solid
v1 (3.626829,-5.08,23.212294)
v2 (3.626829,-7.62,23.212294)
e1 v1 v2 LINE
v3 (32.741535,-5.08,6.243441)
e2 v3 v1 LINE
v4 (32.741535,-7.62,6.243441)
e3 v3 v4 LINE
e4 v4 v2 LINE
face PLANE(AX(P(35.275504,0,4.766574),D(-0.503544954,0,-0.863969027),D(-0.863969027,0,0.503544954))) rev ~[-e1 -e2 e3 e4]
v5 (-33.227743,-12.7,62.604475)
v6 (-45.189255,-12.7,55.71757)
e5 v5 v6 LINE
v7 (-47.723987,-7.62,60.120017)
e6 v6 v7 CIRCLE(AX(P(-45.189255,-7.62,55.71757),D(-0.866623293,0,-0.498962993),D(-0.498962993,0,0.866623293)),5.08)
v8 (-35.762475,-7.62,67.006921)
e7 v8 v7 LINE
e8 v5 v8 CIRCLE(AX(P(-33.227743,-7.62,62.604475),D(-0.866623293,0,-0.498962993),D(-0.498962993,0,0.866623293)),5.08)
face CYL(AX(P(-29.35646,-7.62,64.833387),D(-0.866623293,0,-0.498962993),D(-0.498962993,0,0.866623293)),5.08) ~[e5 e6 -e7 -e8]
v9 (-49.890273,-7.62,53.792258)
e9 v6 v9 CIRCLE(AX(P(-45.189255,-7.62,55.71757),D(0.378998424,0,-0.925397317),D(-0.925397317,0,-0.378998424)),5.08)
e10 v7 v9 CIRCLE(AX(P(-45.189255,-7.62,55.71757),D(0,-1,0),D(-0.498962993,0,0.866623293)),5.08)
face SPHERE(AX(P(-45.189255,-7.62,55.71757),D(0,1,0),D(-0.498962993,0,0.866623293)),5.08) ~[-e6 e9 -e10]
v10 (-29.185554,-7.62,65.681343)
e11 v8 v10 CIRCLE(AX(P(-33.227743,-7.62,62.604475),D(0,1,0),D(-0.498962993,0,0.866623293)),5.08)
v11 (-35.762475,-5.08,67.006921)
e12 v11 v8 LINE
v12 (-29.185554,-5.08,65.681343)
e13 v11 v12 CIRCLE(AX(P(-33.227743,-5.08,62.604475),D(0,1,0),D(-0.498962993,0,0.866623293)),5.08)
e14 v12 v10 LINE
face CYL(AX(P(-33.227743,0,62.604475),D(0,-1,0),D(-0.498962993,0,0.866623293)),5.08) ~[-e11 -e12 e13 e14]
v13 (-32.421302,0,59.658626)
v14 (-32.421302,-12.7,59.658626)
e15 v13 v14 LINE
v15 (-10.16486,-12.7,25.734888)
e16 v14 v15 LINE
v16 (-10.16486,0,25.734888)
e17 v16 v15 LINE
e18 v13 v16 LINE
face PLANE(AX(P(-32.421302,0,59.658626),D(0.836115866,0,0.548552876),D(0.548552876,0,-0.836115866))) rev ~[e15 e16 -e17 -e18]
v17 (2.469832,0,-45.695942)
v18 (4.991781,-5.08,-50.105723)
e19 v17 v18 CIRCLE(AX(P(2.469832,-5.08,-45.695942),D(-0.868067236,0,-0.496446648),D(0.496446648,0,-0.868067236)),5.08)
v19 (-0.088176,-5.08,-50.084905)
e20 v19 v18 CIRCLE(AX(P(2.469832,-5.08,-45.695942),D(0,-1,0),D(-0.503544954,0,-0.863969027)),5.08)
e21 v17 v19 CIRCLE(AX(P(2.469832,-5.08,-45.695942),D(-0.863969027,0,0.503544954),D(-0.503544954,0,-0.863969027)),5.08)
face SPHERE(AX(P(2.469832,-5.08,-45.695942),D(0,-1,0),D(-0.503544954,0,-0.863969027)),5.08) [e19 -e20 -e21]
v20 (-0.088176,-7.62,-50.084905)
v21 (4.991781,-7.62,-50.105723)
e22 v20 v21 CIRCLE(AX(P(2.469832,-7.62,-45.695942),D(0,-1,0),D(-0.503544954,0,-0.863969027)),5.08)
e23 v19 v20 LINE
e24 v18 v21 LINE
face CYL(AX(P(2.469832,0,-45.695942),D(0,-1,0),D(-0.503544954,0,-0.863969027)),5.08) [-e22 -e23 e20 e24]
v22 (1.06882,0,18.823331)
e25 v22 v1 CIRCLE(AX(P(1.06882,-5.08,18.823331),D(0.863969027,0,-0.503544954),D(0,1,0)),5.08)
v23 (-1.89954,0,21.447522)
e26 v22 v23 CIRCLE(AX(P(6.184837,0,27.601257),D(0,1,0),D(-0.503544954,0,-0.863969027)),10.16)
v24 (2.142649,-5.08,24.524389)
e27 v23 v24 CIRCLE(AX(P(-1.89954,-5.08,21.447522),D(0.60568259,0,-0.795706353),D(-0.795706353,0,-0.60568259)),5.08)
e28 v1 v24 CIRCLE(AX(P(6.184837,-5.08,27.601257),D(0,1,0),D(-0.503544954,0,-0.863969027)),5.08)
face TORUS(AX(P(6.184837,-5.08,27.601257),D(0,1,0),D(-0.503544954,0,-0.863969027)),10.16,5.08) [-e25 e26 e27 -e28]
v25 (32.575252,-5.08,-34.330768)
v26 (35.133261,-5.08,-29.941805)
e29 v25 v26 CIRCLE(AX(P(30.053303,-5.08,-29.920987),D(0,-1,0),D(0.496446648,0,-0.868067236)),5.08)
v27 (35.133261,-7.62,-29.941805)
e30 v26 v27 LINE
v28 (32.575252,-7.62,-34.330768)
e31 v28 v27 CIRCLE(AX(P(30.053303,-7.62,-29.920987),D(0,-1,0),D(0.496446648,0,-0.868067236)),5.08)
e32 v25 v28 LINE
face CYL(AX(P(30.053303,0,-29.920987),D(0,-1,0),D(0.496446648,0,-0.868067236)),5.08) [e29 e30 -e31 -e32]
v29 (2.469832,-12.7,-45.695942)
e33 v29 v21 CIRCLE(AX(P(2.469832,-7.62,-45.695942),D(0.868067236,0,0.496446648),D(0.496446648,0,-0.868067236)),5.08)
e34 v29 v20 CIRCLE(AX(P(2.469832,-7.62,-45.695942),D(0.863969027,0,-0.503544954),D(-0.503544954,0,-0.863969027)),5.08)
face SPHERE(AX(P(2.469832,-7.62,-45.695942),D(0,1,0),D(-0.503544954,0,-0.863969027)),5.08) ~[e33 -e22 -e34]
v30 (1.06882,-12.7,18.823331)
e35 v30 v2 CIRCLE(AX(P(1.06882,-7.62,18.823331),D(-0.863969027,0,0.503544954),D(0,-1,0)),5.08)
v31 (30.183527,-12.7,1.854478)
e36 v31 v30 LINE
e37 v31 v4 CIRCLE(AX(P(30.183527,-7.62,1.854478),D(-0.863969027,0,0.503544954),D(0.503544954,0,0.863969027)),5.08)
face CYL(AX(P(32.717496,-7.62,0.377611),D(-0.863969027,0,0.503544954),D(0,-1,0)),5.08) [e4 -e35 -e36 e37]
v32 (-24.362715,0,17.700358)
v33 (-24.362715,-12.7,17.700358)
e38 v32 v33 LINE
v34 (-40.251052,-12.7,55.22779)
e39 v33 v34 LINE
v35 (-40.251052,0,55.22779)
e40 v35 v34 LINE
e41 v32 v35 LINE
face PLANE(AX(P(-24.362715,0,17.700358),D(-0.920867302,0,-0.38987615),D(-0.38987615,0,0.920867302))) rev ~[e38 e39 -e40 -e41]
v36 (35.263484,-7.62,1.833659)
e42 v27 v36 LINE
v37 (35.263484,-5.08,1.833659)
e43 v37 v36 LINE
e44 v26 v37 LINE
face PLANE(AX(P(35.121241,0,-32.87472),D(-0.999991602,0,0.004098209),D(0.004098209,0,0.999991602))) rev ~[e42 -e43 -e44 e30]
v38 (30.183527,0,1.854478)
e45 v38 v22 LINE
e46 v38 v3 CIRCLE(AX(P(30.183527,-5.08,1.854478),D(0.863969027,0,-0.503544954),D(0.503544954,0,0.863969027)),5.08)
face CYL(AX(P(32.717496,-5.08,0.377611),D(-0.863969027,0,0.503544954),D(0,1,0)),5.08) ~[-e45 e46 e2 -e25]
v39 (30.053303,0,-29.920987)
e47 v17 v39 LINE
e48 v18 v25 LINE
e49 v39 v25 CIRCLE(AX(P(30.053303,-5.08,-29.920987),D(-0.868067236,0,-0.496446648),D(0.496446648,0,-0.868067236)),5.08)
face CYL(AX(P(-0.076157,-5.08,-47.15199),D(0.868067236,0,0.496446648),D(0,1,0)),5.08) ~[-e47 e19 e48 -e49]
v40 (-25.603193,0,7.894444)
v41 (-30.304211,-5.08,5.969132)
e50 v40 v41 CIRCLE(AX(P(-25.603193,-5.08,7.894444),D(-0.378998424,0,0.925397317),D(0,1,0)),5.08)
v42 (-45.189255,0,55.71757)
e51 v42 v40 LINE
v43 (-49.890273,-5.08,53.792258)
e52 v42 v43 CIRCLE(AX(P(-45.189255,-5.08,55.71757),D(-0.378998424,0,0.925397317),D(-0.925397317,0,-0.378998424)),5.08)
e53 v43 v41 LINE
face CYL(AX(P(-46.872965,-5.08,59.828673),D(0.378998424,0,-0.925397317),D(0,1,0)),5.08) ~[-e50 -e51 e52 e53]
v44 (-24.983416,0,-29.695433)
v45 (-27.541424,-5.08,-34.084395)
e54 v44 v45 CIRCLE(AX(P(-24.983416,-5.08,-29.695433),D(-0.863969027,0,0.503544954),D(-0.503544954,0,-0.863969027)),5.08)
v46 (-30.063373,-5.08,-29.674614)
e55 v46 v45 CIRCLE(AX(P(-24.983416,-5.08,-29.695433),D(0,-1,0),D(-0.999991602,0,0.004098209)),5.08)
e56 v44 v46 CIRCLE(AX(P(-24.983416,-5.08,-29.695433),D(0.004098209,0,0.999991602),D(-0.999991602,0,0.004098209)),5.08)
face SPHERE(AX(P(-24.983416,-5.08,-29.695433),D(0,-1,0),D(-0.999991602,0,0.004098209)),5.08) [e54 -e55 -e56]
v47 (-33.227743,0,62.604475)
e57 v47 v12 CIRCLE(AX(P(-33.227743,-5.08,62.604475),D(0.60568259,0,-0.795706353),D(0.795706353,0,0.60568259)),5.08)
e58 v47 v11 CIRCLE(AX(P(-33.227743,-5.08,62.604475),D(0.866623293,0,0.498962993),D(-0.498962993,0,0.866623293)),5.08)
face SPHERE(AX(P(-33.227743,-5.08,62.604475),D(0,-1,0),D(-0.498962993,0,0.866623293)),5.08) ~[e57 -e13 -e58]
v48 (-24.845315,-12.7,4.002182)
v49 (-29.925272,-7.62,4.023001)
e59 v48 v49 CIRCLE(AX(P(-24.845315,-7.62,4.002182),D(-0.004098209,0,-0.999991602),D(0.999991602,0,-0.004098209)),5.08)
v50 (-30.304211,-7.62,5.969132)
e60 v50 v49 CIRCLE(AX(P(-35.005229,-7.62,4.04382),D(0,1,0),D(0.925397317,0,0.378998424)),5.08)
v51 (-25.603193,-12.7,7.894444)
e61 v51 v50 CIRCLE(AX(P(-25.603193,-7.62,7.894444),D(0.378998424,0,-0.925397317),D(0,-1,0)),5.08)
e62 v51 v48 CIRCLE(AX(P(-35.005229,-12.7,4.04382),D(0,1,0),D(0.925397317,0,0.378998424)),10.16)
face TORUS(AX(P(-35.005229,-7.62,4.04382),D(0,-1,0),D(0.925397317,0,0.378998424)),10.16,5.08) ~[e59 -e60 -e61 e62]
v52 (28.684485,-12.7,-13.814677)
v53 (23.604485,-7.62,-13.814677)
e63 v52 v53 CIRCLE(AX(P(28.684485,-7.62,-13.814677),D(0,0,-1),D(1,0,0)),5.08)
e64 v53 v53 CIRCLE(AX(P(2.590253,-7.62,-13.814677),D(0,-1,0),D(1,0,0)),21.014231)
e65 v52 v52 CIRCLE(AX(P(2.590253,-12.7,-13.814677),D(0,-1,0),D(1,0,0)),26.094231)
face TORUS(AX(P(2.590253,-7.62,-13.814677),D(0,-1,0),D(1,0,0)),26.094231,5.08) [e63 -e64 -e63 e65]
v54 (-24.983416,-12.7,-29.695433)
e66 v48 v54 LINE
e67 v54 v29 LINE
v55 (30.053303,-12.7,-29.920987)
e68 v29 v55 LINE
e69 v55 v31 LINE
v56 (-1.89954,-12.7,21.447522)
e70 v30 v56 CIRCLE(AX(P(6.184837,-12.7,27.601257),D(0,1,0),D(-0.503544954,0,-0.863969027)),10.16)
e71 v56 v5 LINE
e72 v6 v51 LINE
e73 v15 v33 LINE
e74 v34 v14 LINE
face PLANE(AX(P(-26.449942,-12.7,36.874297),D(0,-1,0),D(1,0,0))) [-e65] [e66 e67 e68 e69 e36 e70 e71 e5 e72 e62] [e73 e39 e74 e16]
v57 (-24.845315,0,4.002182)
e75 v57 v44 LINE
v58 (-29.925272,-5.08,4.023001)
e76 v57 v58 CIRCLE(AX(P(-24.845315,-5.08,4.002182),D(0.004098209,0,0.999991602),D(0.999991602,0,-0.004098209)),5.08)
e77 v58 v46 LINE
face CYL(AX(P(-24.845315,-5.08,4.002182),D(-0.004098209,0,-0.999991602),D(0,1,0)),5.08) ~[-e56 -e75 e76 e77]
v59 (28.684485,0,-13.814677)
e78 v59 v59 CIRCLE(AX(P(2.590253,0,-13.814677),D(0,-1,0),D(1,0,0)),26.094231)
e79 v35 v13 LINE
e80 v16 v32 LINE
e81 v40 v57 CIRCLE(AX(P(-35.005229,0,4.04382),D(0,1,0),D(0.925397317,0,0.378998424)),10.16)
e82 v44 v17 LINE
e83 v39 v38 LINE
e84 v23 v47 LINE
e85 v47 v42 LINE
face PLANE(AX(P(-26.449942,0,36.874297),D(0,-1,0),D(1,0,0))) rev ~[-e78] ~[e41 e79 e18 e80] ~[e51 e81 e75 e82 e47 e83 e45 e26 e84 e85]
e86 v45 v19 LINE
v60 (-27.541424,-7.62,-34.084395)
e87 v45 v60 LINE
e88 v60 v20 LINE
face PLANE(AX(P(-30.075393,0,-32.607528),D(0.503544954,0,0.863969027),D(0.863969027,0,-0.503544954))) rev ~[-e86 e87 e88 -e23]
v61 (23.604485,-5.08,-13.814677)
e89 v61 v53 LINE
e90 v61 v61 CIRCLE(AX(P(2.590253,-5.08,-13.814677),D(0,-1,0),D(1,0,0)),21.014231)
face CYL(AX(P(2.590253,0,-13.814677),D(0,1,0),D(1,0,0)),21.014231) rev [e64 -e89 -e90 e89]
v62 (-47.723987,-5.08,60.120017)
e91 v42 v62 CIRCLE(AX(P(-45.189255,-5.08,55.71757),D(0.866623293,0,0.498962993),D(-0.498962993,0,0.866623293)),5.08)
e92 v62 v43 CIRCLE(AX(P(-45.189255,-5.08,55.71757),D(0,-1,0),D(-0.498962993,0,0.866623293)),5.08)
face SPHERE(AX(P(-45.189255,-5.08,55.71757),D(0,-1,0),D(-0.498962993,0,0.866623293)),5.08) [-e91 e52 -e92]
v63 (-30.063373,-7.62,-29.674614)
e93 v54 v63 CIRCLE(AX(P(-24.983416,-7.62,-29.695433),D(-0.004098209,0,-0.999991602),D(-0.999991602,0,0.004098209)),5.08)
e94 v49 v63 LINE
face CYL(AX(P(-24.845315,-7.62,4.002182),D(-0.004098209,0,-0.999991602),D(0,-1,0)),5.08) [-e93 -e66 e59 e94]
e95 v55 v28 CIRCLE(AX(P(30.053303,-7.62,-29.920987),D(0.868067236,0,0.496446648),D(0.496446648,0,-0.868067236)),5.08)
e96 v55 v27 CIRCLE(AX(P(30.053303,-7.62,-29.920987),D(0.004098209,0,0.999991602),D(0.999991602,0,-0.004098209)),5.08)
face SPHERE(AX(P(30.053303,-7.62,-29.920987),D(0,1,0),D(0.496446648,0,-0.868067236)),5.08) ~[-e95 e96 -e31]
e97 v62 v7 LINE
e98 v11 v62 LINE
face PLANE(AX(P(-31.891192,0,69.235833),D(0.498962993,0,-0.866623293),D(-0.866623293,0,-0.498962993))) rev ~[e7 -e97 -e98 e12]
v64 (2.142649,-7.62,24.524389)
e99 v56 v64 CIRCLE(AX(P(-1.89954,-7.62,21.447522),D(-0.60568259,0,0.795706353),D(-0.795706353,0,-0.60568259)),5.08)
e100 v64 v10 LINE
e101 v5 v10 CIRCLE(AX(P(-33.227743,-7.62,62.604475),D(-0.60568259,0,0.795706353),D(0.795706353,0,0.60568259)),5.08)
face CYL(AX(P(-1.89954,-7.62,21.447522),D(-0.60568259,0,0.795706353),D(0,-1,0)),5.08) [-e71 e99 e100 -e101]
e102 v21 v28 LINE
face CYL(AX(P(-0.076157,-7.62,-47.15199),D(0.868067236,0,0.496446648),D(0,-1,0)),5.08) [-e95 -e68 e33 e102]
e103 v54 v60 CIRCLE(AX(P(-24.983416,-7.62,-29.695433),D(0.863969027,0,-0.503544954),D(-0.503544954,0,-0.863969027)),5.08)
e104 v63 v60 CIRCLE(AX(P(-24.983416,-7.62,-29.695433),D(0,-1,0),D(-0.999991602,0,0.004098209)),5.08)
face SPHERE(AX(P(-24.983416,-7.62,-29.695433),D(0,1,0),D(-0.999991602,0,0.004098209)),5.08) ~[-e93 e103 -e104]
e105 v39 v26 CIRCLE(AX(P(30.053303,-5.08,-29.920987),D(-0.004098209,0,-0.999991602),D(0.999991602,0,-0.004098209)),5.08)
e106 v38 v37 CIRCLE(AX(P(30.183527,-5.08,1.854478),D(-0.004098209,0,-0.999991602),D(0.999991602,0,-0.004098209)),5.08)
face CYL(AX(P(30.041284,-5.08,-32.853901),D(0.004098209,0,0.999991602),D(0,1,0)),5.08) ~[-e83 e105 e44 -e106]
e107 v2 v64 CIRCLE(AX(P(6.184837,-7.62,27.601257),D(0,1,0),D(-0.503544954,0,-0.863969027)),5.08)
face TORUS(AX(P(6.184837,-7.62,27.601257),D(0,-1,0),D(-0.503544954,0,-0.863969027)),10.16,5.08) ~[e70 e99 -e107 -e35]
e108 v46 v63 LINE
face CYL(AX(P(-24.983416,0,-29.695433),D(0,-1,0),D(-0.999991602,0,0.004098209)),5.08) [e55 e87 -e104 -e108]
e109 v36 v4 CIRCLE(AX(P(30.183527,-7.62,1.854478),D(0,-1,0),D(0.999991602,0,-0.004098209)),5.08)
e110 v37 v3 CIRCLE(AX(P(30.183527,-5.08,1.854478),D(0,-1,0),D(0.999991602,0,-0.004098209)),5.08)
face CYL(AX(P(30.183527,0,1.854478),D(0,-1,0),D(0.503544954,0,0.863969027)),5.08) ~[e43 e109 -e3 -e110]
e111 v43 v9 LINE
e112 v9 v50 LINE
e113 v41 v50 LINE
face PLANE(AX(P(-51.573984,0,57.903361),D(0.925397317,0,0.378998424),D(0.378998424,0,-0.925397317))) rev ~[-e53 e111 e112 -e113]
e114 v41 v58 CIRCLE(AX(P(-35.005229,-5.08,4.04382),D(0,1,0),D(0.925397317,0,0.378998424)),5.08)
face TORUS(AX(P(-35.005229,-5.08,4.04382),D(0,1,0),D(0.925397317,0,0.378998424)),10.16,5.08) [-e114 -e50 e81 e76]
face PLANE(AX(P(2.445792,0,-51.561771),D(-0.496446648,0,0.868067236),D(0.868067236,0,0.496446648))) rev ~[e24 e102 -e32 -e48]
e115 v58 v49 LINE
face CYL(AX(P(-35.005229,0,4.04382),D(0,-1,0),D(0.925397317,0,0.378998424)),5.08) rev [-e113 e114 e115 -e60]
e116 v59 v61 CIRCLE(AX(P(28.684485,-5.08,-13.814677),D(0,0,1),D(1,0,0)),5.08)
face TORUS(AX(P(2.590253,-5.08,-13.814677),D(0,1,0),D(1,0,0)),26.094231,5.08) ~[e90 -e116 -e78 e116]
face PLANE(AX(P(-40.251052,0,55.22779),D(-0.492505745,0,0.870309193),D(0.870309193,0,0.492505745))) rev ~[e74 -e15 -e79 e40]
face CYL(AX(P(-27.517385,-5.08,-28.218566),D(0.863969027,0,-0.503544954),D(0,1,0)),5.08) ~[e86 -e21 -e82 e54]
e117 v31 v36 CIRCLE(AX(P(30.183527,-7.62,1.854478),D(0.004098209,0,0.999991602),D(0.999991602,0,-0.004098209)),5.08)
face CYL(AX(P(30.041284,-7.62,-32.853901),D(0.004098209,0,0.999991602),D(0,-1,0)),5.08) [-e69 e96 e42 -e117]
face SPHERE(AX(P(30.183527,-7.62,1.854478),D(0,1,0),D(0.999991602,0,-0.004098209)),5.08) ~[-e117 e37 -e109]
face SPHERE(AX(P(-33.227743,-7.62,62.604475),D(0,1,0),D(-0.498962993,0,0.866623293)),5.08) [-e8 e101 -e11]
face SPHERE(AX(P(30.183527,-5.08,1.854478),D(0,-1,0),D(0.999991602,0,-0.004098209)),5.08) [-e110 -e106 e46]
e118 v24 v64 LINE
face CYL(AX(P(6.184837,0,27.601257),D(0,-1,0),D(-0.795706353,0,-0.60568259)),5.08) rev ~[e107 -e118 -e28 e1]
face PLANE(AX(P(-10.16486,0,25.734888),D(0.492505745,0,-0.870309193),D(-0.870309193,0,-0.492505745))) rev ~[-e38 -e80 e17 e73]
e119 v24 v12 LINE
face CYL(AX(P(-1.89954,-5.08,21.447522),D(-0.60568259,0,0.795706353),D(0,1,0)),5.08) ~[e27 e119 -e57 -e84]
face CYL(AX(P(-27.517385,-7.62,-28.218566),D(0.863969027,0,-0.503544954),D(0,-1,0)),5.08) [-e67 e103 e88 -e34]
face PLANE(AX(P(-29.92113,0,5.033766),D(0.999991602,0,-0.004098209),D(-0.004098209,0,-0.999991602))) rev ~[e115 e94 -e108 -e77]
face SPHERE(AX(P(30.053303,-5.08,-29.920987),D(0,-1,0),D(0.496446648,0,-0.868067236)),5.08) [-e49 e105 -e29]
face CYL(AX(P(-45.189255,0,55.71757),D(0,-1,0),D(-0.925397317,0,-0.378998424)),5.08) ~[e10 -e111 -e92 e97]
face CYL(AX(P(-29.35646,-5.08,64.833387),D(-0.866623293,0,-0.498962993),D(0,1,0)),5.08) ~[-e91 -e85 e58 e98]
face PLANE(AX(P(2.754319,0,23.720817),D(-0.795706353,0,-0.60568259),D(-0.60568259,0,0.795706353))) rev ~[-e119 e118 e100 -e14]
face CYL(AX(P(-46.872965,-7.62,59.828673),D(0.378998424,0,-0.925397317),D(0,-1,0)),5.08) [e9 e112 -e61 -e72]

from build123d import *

# Parameters (mm, degrees)
F0_R     = 21.014231477
F1_DEPTH = 12.7
F2_F1_R  = 5.08
F2_F2_R  = 5.08


with BuildPart() as f1:
    # F0 (on Front) → F1 (new body)
    with BuildSketch(Plane.XZ):
        Polygon((-51.5739838451, 57.903360525), (-29.9211297043, 5.0337655893), (2.754318782, 23.7208167973), (-31.8911919502, 69.2358331578), align=None)
        Polygon((-32.4213020707, 59.6586255942), (-10.1648603382, 25.7348876013), (-24.3627145166, 17.7003582495), (-40.2510521891, 55.227790036), align=None, mode=Mode.SUBTRACT)
        Polygon((-29.9211297043, 5.0337655893), (-30.0753928796, -32.6075284839), (2.4457924315, -51.5617713492), (35.1212409178, -32.8747201412), (35.2755040931, 4.766573932), (2.754318782, 23.7208167973), align=None)
        with Locations((2.5902532507, -13.814676553)):
            Circle(F0_R, mode=Mode.SUBTRACT)
    extrude(amount=F1_DEPTH)

    # F2: fillet of radius 5.08 on 22 edges, made by hand

    # F2_f1
    f2_f1_edges = [f1.edges().sort_by_distance(p)[0] for p in [
        (-29.9211297043, -6.35, 5.0337655893),
        (2.754318782, -6.35, 23.7208167973),
    ]]
    fillet(f2_f1_edges, radius=F2_F1_R)

    # F2_f2
    f2_f2_edges = [f1.edges().sort_by_distance(p)[0] for p in [
        (-18.4239782263, -12.7, -13.814676553),
        (-30.0753928796, -6.35, -32.6075284839),
        (-30.0003324711, 0, -14.2922636402),
        (-30.0003324711, -12.7, -14.2922636402),
        (2.4457924315, -6.35, -51.5617713492),
        (-13.8148002241, 0, -42.0846499165),
        (-13.8148002241, -12.7, -42.0846499165),
        (35.1212409178, -6.35, -32.8747201412),
        (18.7835166747, 0, -42.2182457452),
        (18.7835166747, -12.7, -42.2182457452),
        (35.2755040931, -6.35, 4.766573932),
        (35.1983725055, 0, -14.0540731046),
        (35.1983725055, -12.7, -14.0540731046),
        (19.4511663483, 0, 13.9894339824),
        (19.4511663483, -12.7, 13.9894339824),
        (-31.8911919502, -6.35, 69.2358331578),
        (-51.5739838451, -6.35, 57.903360525),
        (-41.7325878977, 0, 63.5695968414),
        (-41.7325878977, -12.7, 63.5695968414),
        (-18.4239782263, 0, -13.814676553),
        (2.8201605652, -12.7, 23.7952939078),
        (2.8201605652, 0, 23.7952939078),
        (-30.0188752401, -12.7, 5.0147331632),
        (-30.0188752401, 0, 5.0147331632),
    ]]
    fillet(f2_f2_edges, radius=F2_F2_R)


solid = f1.part
